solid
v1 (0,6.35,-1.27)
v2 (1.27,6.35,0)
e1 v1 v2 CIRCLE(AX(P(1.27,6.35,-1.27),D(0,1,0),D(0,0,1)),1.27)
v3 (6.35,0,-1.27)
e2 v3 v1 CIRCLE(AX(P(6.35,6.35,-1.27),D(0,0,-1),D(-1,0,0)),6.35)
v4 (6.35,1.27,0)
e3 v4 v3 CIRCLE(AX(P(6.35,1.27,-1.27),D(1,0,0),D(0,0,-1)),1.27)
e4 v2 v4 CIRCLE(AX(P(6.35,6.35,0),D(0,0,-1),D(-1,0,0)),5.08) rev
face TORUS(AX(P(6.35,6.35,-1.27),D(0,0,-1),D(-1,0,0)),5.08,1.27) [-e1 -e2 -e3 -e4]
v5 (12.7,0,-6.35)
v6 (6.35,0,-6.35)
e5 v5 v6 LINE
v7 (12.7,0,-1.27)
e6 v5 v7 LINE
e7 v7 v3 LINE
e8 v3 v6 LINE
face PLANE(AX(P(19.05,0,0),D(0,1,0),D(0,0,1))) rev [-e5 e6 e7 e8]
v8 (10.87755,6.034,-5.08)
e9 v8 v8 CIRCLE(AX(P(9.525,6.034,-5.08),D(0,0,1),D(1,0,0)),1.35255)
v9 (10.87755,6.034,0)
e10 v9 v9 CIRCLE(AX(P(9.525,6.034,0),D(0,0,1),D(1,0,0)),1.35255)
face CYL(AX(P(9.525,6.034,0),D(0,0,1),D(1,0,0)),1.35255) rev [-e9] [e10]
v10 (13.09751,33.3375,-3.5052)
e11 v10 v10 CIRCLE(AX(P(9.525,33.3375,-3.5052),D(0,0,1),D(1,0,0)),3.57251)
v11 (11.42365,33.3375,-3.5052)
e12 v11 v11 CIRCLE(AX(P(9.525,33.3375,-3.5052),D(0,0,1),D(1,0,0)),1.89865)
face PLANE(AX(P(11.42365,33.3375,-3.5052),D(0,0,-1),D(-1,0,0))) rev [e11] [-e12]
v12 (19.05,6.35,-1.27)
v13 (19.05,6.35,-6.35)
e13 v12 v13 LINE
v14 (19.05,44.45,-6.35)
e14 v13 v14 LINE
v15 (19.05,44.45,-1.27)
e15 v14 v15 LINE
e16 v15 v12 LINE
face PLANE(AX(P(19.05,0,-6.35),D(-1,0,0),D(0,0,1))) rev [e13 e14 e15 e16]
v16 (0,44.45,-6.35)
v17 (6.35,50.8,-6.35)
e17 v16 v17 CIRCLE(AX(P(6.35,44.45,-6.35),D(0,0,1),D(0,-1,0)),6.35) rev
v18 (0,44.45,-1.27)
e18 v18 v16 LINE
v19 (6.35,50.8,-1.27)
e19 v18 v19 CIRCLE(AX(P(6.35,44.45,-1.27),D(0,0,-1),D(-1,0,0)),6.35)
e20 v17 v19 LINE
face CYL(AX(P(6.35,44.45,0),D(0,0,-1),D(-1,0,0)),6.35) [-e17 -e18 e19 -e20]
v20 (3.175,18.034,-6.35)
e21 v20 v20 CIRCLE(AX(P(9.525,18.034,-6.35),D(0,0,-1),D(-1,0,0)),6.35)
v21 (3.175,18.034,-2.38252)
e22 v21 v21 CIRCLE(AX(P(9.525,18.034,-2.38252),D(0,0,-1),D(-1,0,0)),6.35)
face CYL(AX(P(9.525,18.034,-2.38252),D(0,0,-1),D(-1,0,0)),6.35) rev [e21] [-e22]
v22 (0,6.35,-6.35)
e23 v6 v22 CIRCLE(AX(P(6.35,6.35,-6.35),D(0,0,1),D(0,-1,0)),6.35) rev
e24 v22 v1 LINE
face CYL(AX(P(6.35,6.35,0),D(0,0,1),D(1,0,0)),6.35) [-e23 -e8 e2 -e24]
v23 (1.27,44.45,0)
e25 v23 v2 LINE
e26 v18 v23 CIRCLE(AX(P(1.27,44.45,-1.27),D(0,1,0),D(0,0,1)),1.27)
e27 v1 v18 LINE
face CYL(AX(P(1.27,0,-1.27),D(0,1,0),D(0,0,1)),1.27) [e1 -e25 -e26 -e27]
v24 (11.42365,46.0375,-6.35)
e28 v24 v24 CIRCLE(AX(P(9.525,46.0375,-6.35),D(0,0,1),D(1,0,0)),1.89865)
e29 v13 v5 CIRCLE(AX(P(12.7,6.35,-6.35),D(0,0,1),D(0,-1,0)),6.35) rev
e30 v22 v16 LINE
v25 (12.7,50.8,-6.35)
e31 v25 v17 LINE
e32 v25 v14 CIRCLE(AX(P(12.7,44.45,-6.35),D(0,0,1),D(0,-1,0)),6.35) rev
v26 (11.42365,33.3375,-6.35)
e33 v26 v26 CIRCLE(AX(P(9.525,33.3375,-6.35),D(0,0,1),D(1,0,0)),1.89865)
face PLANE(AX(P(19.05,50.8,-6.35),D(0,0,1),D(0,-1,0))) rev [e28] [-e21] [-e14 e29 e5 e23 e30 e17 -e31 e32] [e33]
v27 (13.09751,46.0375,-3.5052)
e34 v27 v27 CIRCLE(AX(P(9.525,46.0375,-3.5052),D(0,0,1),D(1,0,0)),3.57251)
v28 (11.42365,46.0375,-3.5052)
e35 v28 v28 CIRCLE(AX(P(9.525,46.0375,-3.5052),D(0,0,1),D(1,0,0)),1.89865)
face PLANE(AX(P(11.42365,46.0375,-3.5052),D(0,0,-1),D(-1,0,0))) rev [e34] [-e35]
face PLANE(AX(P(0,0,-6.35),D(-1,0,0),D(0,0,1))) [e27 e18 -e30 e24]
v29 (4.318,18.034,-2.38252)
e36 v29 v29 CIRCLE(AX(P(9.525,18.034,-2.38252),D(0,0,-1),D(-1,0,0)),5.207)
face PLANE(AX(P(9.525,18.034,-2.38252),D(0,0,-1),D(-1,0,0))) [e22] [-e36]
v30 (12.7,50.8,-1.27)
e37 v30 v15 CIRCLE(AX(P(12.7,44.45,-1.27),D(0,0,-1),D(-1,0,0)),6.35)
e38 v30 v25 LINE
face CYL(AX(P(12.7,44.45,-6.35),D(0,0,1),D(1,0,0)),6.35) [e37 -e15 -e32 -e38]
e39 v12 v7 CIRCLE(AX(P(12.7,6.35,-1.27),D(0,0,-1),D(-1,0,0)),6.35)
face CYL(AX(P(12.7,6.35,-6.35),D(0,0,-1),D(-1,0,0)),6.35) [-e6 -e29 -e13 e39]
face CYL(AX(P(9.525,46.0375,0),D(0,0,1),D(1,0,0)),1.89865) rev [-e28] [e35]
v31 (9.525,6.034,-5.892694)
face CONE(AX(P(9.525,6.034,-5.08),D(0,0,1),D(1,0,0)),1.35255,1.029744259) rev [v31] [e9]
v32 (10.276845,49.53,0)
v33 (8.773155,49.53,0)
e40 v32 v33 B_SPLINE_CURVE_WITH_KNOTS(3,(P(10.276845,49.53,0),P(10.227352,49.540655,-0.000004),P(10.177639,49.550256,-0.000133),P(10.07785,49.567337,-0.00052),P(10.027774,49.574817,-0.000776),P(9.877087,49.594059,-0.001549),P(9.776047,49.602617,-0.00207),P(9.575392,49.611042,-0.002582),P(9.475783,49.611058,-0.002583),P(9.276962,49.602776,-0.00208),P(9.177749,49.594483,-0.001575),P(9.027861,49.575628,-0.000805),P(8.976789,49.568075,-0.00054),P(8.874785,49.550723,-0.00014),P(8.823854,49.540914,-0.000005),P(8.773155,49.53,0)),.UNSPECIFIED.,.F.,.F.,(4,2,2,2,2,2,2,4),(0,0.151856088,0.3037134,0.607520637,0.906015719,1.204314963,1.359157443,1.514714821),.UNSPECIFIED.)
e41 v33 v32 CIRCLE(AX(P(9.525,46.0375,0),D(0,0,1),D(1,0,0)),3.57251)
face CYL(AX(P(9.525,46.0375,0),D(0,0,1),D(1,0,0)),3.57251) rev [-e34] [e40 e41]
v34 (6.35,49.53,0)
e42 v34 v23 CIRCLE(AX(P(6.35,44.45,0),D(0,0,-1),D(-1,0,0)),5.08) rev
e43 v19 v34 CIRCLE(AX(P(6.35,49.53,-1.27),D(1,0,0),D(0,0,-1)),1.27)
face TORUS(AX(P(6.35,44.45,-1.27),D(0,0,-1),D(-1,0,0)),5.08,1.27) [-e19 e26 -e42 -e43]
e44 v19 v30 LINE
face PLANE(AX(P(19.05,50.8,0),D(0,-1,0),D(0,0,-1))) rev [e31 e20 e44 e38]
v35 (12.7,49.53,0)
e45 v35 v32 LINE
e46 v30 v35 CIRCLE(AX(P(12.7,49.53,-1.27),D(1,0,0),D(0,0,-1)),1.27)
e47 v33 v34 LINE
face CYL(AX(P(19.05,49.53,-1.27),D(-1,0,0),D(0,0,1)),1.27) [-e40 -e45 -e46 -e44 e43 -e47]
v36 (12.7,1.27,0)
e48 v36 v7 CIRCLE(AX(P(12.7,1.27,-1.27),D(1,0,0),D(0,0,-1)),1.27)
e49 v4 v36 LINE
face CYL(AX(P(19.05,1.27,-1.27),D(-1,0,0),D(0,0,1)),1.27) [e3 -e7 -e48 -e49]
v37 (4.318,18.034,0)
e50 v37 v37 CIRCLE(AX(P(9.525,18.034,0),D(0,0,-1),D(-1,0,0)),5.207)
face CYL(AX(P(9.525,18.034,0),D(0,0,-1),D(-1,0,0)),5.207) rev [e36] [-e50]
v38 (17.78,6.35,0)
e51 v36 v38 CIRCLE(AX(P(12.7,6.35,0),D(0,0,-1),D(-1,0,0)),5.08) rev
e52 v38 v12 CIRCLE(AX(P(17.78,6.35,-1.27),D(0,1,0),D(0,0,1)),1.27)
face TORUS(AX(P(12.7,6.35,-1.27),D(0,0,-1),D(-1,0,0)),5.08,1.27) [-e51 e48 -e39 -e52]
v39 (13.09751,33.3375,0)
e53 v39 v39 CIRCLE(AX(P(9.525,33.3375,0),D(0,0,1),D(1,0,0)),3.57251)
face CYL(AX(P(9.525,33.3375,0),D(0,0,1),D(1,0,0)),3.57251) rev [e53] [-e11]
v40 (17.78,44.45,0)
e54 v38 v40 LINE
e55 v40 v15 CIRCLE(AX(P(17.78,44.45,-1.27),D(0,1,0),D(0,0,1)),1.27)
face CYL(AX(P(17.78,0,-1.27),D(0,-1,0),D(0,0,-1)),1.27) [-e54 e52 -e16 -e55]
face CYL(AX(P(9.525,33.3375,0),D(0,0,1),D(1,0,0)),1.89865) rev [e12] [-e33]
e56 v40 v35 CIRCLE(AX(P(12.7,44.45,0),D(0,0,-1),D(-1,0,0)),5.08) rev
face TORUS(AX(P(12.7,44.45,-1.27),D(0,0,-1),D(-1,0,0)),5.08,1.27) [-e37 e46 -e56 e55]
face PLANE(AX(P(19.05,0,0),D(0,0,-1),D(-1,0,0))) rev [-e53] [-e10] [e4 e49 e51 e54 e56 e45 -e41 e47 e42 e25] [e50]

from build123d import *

# Parameters (mm, degrees)
SKETCH1_W                                      = 6.35
SKETCH1_H                                      = 50.8
BODY_DEPTH                                     = 19.05
SKETCH2_R                                      = 5.207
PITCH_AXLE_OPENING_DEPTH                       = 6.35
CBORE_FOR_6_SOCKET_HEAD_CAP_SCREW1_D           = 3.7973
CBORE_FOR_6_SOCKET_HEAD_CAP_SCREW1_CBORE_D     = 7.14502
CBORE_FOR_6_SOCKET_HEAD_CAP_SCREW1_CBORE_DEPTH = 3.5052
F_6_32_TAPPED_HOLE1_D                          = 2.7051
F_6_32_TAPPED_HOLE1_DEPTH                      = 5.08
F_6_32_TAPPED_HOLE1_TIP                        = 0.81269403
SKETCH2_3_R                                    = 6.35
SKETCH2_3_R_2                                  = 5.207
PITCH_BEARING_RECESS_DEPTH                     = 3.96748
FILLET1_R                                      = 6.35
FILLET2_R                                      = 1.27


with BuildPart() as part:
    # Sketch1 → Body (new body)
    with BuildSketch(Plane(origin=(0, 0, 0), x_dir=(0, 0, -1), z_dir=(1, 0, 0))):
        with Locations((3.175, 25.4)):
            Rectangle(SKETCH1_W, SKETCH1_H)
    extrude(amount=BODY_DEPTH)

    # Sketch2 → Pitch Axle Opening (cut)
    with BuildSketch(Plane(origin=(0, 0, -6.35), x_dir=(-1, 0, 0), z_dir=(0, 0, -1))):
        with Locations((-9.525, 18.034)):
            Circle(SKETCH2_R)
    extrude(amount=-PITCH_AXLE_OPENING_DEPTH, mode=Mode.SUBTRACT)

    # CBORE for #6 Socket Head Cap Screw1 (through all)
    with Locations(Plane.XY):
        with Locations((9.525, 46.0375), (9.525, 33.3375)):
            CounterBoreHole(CBORE_FOR_6_SOCKET_HEAD_CAP_SCREW1_D / 2, CBORE_FOR_6_SOCKET_HEAD_CAP_SCREW1_CBORE_D / 2, CBORE_FOR_6_SOCKET_HEAD_CAP_SCREW1_CBORE_DEPTH)

    # #6-32 Tapped Hole1
    with Locations(Plane(origin=(9.525, 6.034, 0), x_dir=(1, 0, 0), z_dir=(0, 0, 1))):
        with Locations((0, 0)):
            Hole(F_6_32_TAPPED_HOLE1_D / 2, depth=F_6_32_TAPPED_HOLE1_DEPTH)
            with Locations((0, 0, -(F_6_32_TAPPED_HOLE1_DEPTH + F_6_32_TAPPED_HOLE1_TIP / 2))):  # 118° drill point
                Cone(0, F_6_32_TAPPED_HOLE1_D / 2, F_6_32_TAPPED_HOLE1_TIP, mode=Mode.SUBTRACT)

    # Sketch2<3> → Pitch Bearing Recess (cut)
    with BuildSketch(Plane(origin=(0, 0, -6.35), x_dir=(-1, 0, 0), z_dir=(0, 0, -1))):
        with Locations((-9.525, 18.034)):
            Circle(SKETCH2_3_R)
        with Locations((-9.525, 18.034)):
            Circle(SKETCH2_3_R_2, mode=Mode.SUBTRACT)
    extrude(amount=-PITCH_BEARING_RECESS_DEPTH, mode=Mode.SUBTRACT)

    # Fillet1
    fillet1_edges = [part.edges().sort_by_distance(p)[0] for p in [
        (19.05, 50.8, -3.175),
        (19.05, 0, -3.175),
        (0, 50.8, -3.175),
        (0, 0, -3.175),
    ]]
    fillet(fillet1_edges, radius=FILLET1_R)

    # Fillet2
    # the kernel refuses this fillet: 1.27 mm, written as the material it takes off along each edge
    with BuildSketch(Plane(origin=(6.35, 50.8, 0), x_dir=(0, -1, 0), z_dir=(1, 0, 0))) as fillet2_piece_1:
        with BuildLine():
            CenterArc((FILLET2_R, FILLET2_R), FILLET2_R, 180, 90)
            Line((0, FILLET2_R), (0, 0))
            Line((0, 0), (FILLET2_R, 0))
        make_face()
    extrude(amount=6.35, mode=Mode.SUBTRACT)
    with BuildSketch(Plane(origin=(0, 6.35, 0), x_dir=(1, 0, 0), z_dir=(0, 1, 0))) as fillet2_piece_2:
        with BuildLine():
            CenterArc((FILLET2_R, FILLET2_R), FILLET2_R, 180, 90)
            Line((0, FILLET2_R), (0, 0))
            Line((0, 0), (FILLET2_R, 0))
        make_face()
    extrude(amount=38.1, mode=Mode.SUBTRACT)
    with BuildSketch(Plane(origin=(6.35, 0, 0), x_dir=(0, 1, 0), z_dir=(1, 0, 0))) as fillet2_piece_3:
        with BuildLine():
            CenterArc((FILLET2_R, -FILLET2_R), FILLET2_R, 90, 90)
            Line((0, -FILLET2_R), (0, 0))
            Line((0, 0), (FILLET2_R, 0))
        make_face()
    extrude(amount=6.35, mode=Mode.SUBTRACT)
    with BuildSketch(Plane(origin=(19.05, 6.35, 0), x_dir=(-1, 0, 0), z_dir=(0, 1, 0))) as fillet2_piece_4:
        with BuildLine():
            CenterArc((FILLET2_R, -FILLET2_R), FILLET2_R, 90, 90)
            Line((0, -FILLET2_R), (0, 0))
            Line((0, 0), (FILLET2_R, 0))
        make_face()
    extrude(amount=38.1, mode=Mode.SUBTRACT)
    with BuildSketch(Plane(origin=(12.7, 6.35, 0), x_dir=(0, -1, 0), z_dir=(-1, 0, 0))) as fillet2_piece_5:
        with BuildLine():
            CenterArc((6.35 - FILLET2_R, -FILLET2_R), FILLET2_R, 0, 90)
            Line((6.35, -FILLET2_R), (6.35, 0))
            Line((6.35, 0), (6.35 - FILLET2_R, 0))
        make_face()
    revolve(axis=Axis((12.7, 6.35, 0), (0, 0, 1)), revolution_arc=90, mode=Mode.SUBTRACT)
    with BuildSketch(Plane(origin=(6.35, 6.35, 0), x_dir=(0, -1, 0), z_dir=(1, 0, 0))) as fillet2_piece_6:
        with BuildLine():
            CenterArc((6.35 - FILLET2_R, FILLET2_R), FILLET2_R, 270, 90)
            Line((6.35, FILLET2_R), (6.35, 0))
            Line((6.35, 0), (6.35 - FILLET2_R, 0))
        make_face()
    revolve(axis=Axis((6.35, 6.35, 0), (0, 0, -1)), revolution_arc=90, mode=Mode.SUBTRACT)
    with BuildSketch(Plane(origin=(12.7, 44.45, 0), x_dir=(1, 0, 0), z_dir=(0, -1, 0))) as fillet2_piece_7:
        with BuildLine():
            CenterArc((6.35 - FILLET2_R, -FILLET2_R), FILLET2_R, 0, 90)
            Line((6.35, -FILLET2_R), (6.35, 0))
            Line((6.35, 0), (6.35 - FILLET2_R, 0))
        make_face()
    revolve(axis=Axis((12.7, 44.45, 0), (0, 0, 1)), revolution_arc=90, mode=Mode.SUBTRACT)
    with BuildSketch(Plane(origin=(6.35, 44.45, 0), x_dir=(-1, 0, 0), z_dir=(0, -1, 0))) as fillet2_piece_8:
        with BuildLine():
            CenterArc((6.35 - FILLET2_R, FILLET2_R), FILLET2_R, 270, 90)
            Line((6.35, FILLET2_R), (6.35, 0))
            Line((6.35, 0), (6.35 - FILLET2_R, 0))
        make_face()
    revolve(axis=Axis((6.35, 44.45, 0), (0, 0, -1)), revolution_arc=90, mode=Mode.SUBTRACT)


solid = part.part
